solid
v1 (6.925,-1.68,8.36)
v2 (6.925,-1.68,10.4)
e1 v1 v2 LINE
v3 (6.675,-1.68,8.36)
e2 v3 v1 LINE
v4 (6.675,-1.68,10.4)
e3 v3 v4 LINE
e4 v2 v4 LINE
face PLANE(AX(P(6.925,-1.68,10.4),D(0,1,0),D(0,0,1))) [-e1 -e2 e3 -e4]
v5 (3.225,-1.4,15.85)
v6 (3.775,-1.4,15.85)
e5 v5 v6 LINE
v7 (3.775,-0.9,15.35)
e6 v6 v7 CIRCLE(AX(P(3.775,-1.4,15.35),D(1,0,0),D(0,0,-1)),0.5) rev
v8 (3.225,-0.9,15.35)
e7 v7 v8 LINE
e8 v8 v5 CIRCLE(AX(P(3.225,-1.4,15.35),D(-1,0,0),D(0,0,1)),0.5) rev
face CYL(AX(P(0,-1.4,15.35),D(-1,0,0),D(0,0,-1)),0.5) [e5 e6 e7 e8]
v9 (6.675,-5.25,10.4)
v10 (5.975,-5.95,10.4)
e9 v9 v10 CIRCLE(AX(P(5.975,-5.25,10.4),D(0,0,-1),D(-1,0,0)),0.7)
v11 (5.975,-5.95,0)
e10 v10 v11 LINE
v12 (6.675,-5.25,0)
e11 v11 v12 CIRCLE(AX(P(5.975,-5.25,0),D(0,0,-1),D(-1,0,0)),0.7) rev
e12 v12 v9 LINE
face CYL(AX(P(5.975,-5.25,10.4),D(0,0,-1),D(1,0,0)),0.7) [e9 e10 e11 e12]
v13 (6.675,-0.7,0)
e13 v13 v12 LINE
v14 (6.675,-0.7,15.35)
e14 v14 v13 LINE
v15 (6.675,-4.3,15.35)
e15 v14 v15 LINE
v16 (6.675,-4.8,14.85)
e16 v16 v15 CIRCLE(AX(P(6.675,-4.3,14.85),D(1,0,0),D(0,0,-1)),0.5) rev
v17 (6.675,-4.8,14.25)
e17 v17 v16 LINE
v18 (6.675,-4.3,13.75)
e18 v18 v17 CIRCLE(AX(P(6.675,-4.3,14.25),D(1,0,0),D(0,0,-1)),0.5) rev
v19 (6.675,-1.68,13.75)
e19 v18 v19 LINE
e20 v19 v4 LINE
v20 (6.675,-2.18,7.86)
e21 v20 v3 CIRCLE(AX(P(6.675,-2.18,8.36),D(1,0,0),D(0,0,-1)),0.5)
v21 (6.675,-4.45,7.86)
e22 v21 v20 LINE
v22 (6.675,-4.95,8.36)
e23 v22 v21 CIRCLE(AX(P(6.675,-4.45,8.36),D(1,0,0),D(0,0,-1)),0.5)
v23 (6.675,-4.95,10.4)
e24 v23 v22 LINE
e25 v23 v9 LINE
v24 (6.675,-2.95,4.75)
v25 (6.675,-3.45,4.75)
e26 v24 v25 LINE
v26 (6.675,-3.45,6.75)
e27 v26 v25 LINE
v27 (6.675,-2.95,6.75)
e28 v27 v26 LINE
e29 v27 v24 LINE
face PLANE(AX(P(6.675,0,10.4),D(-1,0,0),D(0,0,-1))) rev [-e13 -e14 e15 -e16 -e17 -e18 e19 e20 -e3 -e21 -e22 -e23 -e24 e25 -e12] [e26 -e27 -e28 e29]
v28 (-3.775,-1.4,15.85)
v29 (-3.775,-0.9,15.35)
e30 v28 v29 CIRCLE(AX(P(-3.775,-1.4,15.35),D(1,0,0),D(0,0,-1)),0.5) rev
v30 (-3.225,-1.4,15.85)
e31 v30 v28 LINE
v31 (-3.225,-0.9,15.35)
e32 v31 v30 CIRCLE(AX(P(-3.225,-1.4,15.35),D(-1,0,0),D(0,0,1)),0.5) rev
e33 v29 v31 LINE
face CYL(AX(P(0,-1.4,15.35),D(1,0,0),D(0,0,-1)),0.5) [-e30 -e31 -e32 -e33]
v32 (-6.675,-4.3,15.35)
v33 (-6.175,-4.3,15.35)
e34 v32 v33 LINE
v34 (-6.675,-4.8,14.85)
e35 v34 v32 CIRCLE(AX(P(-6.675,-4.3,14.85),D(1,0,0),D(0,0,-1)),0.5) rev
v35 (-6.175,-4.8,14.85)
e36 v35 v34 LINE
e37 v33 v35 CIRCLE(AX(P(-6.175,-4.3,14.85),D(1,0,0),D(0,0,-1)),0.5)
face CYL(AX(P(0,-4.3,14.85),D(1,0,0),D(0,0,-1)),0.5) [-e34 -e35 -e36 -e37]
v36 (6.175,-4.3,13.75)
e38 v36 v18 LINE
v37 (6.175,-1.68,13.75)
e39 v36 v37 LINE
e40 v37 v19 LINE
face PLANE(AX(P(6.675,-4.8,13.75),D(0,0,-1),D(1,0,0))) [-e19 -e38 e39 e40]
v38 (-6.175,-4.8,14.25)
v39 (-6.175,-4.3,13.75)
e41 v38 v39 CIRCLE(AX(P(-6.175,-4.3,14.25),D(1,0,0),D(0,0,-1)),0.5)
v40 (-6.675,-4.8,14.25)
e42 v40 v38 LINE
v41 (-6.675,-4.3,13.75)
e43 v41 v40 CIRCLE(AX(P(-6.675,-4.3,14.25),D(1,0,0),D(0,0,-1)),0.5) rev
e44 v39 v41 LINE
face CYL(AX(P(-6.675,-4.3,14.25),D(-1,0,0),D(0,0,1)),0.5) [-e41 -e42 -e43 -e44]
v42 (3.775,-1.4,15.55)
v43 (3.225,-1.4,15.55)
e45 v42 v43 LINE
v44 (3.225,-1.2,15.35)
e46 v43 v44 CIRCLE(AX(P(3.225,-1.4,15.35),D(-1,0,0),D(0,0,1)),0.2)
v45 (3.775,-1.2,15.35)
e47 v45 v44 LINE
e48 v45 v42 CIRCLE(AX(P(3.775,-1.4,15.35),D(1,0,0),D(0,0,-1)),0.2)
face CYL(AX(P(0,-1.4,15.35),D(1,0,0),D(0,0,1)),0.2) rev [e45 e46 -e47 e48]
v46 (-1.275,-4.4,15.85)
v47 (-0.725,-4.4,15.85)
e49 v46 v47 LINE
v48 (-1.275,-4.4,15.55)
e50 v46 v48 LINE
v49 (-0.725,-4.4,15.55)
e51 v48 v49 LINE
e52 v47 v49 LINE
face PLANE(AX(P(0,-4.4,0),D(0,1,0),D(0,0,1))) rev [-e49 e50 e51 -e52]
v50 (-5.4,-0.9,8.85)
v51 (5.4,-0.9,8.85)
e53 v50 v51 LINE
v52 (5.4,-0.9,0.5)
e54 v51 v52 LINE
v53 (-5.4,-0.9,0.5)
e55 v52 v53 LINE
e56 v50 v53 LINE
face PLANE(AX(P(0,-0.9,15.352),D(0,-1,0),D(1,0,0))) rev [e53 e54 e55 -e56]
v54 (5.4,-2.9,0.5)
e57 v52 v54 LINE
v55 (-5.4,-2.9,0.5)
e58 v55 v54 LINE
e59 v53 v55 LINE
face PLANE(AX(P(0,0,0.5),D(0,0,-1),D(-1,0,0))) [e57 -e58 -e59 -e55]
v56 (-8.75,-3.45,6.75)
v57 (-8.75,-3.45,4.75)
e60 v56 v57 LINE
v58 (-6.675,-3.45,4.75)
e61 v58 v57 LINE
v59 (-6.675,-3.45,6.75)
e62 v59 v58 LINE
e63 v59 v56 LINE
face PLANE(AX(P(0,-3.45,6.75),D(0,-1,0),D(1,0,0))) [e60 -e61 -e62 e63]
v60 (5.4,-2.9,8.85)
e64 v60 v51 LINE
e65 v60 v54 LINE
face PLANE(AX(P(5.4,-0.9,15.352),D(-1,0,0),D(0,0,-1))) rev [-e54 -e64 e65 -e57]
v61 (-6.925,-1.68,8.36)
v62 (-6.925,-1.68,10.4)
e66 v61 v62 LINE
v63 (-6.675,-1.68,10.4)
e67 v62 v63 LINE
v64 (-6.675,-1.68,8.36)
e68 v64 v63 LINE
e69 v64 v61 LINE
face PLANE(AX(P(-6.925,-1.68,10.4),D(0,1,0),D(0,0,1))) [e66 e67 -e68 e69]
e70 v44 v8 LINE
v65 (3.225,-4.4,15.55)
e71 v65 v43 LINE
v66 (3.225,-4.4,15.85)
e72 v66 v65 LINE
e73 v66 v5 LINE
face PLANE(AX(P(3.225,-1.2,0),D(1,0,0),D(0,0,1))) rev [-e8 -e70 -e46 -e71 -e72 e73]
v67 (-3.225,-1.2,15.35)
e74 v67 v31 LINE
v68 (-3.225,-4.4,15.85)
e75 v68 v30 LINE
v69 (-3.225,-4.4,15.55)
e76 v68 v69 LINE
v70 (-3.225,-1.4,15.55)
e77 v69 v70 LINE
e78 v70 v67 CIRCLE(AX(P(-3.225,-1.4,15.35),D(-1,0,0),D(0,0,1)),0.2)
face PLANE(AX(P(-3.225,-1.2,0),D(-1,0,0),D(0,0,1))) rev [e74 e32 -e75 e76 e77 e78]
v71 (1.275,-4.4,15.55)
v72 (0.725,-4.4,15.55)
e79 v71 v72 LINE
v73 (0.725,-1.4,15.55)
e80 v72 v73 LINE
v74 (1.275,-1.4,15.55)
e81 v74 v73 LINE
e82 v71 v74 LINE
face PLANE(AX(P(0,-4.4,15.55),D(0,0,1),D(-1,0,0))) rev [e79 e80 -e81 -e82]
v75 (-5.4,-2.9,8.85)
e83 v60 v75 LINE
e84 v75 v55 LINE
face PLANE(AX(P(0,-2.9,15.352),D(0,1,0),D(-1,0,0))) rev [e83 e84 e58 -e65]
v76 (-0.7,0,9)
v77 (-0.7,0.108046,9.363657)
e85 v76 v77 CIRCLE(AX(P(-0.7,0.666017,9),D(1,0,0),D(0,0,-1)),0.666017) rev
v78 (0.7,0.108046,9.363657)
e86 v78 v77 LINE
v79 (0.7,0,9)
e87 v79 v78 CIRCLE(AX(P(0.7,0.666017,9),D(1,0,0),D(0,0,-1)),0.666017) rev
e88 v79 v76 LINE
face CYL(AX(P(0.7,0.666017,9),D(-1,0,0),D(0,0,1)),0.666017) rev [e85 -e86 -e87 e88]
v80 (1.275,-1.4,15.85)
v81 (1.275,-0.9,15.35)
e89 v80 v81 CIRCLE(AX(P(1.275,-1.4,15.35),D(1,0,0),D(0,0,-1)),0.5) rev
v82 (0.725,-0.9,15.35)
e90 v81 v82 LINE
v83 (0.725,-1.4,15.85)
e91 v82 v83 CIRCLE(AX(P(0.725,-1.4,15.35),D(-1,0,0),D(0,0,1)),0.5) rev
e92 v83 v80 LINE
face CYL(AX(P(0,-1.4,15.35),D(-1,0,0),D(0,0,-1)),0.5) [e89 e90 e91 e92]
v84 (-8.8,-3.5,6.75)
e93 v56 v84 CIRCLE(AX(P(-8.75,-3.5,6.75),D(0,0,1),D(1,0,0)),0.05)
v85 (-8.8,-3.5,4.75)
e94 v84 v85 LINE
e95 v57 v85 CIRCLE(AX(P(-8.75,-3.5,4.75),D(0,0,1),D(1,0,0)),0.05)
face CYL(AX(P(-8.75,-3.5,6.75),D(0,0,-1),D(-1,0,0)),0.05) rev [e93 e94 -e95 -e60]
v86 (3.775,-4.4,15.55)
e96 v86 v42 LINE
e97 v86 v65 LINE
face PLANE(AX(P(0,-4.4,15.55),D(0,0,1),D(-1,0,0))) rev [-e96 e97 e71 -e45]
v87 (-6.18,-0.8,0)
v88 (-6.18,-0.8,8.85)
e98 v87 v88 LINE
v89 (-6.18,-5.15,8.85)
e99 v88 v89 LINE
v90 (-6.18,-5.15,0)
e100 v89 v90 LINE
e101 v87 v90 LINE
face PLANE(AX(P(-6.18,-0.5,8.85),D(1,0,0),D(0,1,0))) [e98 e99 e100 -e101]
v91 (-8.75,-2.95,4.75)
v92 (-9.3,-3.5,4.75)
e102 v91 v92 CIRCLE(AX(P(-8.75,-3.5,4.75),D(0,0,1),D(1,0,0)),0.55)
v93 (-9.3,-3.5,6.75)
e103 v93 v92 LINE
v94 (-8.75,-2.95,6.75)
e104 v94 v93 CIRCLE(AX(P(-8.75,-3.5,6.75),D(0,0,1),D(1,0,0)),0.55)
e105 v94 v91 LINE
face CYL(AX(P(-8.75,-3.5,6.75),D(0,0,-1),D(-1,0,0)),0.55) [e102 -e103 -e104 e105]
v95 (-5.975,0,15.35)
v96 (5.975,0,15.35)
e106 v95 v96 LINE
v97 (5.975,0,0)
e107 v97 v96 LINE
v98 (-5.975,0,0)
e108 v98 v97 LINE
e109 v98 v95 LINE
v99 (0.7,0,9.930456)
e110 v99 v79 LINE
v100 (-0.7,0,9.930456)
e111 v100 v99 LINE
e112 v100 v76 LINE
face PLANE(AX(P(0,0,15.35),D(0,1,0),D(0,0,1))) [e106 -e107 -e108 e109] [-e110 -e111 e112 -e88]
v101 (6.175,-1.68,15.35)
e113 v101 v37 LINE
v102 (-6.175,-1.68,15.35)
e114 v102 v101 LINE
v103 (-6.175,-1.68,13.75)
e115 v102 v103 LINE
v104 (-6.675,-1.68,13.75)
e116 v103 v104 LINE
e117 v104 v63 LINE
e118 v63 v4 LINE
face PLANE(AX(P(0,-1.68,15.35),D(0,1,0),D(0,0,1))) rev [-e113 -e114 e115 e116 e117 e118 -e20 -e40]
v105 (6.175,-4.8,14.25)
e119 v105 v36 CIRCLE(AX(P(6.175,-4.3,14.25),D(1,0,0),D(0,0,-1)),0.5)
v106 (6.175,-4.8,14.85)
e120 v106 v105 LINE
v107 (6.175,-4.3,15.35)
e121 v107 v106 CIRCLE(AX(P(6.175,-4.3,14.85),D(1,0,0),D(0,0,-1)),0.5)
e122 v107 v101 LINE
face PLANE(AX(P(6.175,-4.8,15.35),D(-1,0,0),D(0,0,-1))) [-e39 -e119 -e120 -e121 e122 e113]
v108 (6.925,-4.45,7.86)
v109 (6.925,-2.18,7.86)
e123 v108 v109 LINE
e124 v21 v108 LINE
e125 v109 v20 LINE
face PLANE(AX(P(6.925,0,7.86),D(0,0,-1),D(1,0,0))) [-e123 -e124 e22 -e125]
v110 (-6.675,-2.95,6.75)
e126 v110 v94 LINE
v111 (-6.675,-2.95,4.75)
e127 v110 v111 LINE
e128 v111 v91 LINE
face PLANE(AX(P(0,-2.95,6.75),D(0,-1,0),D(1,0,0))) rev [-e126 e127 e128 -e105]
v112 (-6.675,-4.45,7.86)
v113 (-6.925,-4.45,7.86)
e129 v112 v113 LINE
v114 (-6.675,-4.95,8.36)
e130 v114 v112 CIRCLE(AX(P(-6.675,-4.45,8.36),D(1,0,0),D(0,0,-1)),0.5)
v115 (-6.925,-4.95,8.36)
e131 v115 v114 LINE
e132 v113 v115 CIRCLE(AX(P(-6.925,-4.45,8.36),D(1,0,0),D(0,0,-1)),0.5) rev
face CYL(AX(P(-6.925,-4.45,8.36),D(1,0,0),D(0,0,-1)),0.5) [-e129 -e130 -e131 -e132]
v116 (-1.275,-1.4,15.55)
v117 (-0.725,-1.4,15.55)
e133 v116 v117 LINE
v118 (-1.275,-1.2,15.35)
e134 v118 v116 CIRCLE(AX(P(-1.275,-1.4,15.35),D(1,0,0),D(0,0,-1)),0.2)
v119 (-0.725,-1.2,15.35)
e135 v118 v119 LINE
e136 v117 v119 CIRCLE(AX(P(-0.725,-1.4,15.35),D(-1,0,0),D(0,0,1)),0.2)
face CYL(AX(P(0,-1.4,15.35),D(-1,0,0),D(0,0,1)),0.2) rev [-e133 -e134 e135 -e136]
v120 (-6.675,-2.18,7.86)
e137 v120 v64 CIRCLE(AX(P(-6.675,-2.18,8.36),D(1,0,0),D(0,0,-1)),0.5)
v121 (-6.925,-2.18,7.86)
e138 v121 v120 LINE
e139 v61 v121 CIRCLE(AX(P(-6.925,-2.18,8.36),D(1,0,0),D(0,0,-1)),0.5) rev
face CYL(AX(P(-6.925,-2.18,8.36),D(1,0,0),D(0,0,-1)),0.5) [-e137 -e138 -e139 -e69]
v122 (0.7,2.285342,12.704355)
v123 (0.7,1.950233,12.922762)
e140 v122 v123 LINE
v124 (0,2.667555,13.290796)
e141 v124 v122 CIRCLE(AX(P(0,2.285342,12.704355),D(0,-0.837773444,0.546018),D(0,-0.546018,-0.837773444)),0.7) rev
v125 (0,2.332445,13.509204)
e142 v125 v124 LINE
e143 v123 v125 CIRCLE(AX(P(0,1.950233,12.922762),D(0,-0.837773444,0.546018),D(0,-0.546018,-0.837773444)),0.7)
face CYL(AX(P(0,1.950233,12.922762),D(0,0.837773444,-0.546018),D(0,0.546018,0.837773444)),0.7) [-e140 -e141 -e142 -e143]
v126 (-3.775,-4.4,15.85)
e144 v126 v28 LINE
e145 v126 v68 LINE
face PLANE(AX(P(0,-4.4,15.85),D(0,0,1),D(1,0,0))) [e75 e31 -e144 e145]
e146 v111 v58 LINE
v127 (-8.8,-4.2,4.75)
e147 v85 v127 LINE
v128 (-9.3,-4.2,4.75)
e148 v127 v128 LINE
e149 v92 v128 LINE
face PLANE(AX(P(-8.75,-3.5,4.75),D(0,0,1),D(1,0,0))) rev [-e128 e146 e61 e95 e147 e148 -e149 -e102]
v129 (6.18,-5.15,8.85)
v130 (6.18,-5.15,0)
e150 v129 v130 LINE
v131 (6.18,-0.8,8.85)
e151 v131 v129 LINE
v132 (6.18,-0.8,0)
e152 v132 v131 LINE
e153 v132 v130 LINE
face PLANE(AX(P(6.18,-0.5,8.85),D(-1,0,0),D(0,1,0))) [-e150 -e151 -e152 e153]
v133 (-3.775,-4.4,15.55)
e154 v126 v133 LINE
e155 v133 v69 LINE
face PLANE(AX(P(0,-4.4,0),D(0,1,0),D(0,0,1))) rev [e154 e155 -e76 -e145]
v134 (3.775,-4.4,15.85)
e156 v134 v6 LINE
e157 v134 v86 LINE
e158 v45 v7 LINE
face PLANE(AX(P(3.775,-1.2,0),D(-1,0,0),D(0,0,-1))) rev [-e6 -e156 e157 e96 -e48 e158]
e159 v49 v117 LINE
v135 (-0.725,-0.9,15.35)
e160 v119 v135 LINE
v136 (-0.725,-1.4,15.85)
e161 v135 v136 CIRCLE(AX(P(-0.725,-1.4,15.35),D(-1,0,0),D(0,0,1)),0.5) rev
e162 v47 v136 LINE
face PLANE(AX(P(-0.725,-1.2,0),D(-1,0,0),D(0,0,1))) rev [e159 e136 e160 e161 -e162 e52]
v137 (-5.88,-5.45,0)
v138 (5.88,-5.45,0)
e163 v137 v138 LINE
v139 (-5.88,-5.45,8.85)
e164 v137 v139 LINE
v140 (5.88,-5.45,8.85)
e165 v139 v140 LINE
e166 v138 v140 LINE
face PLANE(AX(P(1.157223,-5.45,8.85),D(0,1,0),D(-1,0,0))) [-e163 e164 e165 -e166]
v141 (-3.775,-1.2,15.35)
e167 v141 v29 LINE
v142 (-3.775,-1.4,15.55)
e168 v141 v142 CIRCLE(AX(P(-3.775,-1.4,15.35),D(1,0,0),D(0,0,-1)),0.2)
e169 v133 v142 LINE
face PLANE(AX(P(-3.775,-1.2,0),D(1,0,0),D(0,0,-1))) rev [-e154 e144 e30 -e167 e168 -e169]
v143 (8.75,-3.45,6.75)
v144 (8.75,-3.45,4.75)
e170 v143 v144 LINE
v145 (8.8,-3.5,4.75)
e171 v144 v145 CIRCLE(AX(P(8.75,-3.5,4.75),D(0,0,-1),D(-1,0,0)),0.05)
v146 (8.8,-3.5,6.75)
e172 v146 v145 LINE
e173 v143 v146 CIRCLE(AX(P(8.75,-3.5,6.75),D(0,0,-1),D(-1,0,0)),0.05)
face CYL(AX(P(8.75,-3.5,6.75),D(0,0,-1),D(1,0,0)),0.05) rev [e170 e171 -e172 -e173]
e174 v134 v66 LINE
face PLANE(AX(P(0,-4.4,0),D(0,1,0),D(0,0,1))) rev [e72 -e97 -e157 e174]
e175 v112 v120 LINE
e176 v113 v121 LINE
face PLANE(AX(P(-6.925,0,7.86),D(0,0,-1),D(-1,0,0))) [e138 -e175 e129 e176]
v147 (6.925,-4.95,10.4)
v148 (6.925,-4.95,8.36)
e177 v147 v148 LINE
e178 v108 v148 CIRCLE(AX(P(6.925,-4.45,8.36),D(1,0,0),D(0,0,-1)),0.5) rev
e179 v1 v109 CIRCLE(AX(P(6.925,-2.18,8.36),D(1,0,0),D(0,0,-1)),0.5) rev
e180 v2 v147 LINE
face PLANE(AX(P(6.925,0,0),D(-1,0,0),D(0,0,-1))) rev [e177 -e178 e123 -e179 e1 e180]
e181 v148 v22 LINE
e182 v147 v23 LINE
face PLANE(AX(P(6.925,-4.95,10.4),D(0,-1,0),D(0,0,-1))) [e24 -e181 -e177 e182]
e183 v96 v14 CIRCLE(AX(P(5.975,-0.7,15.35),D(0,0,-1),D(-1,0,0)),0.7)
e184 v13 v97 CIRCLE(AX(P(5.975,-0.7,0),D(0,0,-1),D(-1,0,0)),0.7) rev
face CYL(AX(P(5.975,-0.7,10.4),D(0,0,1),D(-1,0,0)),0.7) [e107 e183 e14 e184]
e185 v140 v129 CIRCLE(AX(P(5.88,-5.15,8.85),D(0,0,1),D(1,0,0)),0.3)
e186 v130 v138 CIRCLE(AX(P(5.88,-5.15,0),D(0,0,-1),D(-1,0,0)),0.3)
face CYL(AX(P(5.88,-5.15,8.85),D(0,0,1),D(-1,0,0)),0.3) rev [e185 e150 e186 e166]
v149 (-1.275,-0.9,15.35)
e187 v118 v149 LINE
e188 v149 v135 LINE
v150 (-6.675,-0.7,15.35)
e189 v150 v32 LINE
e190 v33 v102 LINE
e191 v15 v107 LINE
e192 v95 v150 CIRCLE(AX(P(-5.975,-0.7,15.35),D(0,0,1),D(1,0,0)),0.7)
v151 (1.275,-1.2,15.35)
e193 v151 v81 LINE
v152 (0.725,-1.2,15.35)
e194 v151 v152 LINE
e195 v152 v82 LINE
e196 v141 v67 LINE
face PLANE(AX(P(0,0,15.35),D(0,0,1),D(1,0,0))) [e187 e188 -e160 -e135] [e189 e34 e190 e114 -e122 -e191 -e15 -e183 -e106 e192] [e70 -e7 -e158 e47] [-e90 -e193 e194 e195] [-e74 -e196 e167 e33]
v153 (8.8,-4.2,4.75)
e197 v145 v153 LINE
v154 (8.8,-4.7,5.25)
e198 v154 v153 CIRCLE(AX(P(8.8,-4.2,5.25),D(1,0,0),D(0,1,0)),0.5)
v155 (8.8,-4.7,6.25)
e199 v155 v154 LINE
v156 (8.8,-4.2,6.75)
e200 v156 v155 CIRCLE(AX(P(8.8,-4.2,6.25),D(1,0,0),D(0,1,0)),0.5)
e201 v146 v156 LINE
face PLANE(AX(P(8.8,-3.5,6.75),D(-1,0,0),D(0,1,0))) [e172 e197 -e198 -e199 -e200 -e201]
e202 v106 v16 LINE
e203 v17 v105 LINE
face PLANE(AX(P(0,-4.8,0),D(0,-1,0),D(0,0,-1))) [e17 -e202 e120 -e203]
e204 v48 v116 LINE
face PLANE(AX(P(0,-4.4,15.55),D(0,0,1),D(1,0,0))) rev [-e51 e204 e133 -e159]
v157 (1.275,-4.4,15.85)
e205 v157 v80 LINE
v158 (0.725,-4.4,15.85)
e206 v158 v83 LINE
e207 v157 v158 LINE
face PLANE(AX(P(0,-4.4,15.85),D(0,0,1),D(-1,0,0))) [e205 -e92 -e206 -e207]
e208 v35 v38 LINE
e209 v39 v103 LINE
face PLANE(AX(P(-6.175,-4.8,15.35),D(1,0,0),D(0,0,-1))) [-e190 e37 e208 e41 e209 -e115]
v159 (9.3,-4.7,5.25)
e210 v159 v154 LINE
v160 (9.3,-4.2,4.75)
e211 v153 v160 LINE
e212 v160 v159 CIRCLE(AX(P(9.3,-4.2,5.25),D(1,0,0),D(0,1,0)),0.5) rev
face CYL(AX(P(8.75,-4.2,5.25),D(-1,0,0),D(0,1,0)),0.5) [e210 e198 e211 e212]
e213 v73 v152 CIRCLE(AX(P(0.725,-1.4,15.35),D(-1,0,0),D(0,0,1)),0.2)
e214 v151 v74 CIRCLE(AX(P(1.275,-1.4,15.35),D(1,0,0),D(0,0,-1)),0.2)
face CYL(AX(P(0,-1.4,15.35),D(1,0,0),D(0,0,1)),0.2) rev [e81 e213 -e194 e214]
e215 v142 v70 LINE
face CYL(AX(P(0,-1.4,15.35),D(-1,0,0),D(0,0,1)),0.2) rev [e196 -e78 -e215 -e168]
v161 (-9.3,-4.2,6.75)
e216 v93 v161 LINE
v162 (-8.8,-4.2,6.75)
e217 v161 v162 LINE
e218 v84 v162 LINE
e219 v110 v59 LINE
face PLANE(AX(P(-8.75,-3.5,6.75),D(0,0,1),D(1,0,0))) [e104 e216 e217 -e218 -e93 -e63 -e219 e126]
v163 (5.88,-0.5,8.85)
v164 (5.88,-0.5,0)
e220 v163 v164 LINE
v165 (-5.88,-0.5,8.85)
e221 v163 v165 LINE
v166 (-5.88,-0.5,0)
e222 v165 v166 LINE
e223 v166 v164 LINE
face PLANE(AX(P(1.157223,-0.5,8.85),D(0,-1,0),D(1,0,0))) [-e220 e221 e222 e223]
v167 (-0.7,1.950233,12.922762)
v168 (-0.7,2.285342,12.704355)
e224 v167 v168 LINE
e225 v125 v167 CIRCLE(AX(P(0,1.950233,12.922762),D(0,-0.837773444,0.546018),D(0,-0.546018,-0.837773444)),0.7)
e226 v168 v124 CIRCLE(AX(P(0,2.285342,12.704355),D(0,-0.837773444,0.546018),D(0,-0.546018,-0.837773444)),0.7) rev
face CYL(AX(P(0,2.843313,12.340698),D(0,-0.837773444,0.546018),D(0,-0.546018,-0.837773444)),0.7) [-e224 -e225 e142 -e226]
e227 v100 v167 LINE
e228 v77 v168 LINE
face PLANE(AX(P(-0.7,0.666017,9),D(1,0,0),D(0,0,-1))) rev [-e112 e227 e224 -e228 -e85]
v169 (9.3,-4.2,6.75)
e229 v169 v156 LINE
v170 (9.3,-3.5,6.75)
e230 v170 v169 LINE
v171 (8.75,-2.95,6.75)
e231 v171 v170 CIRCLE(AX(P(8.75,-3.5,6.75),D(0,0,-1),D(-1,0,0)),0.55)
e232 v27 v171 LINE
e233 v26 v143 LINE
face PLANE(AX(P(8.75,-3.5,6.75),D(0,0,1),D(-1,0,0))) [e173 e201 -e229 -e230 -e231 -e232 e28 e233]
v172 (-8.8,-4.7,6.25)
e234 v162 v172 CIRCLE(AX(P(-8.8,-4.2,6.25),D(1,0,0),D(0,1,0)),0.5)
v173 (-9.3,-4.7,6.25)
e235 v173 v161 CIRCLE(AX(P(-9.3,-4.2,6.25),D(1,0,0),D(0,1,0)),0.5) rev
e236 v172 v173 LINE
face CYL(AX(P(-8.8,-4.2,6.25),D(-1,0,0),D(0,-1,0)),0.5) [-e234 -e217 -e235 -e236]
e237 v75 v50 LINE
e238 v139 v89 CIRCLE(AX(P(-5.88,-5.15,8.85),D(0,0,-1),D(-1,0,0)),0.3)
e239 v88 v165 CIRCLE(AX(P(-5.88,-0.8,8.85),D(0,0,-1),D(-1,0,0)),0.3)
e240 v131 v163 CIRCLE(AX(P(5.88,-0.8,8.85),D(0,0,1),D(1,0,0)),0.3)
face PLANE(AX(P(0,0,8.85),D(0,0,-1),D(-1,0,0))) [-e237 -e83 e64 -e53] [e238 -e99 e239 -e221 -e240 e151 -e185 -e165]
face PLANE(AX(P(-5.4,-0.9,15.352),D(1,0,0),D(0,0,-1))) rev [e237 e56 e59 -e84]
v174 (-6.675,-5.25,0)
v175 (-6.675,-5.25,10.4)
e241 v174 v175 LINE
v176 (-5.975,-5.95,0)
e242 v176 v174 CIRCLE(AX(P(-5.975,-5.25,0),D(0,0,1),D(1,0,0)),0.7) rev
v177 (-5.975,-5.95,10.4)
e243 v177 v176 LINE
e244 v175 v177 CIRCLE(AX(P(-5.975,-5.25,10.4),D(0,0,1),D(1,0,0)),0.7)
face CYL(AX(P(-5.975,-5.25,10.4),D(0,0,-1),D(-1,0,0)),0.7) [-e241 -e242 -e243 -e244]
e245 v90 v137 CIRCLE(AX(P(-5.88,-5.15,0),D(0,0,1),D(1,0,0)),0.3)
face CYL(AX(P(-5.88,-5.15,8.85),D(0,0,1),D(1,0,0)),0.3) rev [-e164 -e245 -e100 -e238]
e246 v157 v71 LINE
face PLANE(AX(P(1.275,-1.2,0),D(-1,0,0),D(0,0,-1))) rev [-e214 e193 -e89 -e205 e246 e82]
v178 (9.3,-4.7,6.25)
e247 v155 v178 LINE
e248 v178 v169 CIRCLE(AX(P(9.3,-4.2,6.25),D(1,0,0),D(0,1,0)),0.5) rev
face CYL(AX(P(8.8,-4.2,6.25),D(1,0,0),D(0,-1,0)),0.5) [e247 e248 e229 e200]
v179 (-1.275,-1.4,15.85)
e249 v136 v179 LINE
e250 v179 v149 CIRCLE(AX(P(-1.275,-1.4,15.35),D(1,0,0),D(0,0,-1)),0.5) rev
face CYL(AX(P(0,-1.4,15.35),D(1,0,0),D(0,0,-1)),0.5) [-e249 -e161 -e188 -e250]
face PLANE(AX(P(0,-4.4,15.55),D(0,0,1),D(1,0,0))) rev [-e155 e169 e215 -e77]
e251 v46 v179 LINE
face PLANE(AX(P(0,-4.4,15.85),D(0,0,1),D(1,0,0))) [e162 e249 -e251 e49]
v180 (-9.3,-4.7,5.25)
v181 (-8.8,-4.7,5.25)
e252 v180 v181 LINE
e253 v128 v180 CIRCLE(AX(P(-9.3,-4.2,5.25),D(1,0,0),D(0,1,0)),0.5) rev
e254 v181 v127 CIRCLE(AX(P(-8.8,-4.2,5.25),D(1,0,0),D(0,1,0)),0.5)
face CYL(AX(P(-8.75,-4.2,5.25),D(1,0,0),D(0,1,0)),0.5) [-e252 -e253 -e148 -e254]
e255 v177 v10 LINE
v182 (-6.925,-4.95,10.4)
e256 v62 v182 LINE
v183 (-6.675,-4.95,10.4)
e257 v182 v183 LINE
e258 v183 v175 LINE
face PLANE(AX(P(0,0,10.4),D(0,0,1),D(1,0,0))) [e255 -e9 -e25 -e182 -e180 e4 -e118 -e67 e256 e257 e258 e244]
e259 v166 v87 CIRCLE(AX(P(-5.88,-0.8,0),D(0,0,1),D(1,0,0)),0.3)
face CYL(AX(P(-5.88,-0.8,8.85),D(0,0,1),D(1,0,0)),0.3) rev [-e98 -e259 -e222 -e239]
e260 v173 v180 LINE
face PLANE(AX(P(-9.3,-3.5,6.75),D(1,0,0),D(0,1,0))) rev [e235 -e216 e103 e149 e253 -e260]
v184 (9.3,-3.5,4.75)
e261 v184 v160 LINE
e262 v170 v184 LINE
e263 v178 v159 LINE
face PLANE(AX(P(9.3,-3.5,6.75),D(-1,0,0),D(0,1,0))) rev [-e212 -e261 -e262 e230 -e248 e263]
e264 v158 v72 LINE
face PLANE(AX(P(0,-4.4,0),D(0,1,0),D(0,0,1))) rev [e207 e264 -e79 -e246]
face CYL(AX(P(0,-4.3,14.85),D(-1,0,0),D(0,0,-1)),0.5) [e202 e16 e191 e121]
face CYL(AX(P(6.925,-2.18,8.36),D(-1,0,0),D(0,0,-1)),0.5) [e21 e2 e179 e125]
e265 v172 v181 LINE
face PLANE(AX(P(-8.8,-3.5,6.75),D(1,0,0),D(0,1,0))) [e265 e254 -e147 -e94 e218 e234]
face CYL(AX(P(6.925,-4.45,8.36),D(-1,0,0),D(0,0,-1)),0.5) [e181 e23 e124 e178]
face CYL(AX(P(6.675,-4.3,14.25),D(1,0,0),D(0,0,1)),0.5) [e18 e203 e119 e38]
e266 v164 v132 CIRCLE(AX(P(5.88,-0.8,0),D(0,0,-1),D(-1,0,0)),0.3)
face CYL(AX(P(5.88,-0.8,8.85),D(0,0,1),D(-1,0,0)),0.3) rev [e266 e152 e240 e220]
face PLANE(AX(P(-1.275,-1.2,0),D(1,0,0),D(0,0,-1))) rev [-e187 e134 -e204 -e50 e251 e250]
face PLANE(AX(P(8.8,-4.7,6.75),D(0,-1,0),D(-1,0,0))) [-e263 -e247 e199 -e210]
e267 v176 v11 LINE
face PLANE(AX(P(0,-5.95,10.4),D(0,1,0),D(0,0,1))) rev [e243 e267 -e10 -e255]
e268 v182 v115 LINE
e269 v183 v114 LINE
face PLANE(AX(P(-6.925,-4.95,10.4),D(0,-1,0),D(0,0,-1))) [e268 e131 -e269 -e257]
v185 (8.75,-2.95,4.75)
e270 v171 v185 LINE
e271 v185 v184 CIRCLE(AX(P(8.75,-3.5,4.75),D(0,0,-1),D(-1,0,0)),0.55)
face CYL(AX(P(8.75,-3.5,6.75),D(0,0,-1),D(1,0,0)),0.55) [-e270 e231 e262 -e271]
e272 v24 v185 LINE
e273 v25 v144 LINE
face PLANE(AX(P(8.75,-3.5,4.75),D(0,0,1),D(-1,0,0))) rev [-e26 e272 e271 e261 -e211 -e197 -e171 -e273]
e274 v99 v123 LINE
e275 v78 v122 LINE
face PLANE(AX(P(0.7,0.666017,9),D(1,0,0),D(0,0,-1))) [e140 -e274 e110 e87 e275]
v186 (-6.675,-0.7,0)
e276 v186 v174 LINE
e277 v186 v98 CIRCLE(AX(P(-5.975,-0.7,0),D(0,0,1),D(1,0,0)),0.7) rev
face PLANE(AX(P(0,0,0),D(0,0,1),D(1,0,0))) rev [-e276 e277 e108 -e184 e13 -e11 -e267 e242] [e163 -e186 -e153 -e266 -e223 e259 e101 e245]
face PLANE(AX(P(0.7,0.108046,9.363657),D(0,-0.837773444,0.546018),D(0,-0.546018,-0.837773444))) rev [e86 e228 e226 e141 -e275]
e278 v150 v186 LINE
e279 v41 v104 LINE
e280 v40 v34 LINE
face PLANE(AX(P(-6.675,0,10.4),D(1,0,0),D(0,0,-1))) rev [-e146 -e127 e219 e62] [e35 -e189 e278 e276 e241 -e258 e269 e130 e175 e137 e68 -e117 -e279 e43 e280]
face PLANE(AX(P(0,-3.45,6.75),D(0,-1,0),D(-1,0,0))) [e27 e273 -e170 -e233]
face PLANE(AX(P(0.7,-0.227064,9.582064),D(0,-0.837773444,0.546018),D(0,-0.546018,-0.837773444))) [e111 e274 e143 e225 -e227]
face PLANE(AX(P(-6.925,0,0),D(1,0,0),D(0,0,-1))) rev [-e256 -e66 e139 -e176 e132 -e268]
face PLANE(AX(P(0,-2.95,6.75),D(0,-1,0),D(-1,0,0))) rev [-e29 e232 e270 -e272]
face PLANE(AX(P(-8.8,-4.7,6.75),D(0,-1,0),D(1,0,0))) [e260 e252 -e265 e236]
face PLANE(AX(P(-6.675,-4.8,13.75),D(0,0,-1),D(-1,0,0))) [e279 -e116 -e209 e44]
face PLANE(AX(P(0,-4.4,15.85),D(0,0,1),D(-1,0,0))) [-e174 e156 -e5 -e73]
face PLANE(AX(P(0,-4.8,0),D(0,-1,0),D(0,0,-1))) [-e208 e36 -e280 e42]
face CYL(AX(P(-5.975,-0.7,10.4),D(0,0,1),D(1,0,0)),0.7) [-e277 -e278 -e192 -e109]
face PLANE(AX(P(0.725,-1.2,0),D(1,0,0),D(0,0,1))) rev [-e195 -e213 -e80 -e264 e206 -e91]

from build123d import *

# Parameters (mm, degrees)
SKIZZE1_W                         = 6.675
SKIZZE1_H                         = 4.27
AUFSATZ_LINEAR_AUSTRAGEN1_DEPTH   = 10.4
SKIZZE1_3_W                       = 6.675
SKIZZE1_3_H                       = 1.68
AUFSATZ_LINEAR_AUSTRAGEN2_DEPTH   = 15.35
LINEAR_AUSTRAGEN_D_NN1_START      = 4.75
LINEAR_AUSTRAGEN_D_NN1_DEPTH      = 2
SKIZZE3_W                         = 0.5
SKIZZE3_H                         = 1.6
AUFSATZ_LINEAR_AUSTRAGEN3_DEPTH   = 4.8
SKIZZE4_W                         = 7.337223246
SKIZZE4_H                         = 4.95
SCHNITT_LINEAR_AUSTRAGEN1_DEPTH   = 8.85
AUFSATZ_LINEAR_AUSTRAGEN4_REACH   = 21.408
AUFSATZ_LINEAR_START              = 0.5
SKIZZE5_W                         = 5.4
SKIZZE5_H                         = 2
AUFSATZ_LINEAR_START_2            = -0.9
SKIZZE6_W                         = 0.55
SKIZZE6_H                         = 0.3
AUFSATZ_LINEAR_AUSTRAGEN5_DEPTH   = 3.5
AUFSATZ_LINEAR_AUSTRAGEN5_2_DEPTH = 3.5
SKIZZE6_3_W                       = 0.55
SKIZZE6_3_H                       = 0.2
AUFSATZ_LINEAR_AUSTRAGEN6_DEPTH   = 0.3
VERRUNDUNG1_R                     = 0.2
VERRUNDUNG2_R                     = 0.5
VERRUNDUNG3_R                     = 0.3
VERRUNDUNG4_R                     = 0.7
AUFSATZ_LINEAR_START_3            = -6.675
SKIZZE7_W                         = 2.54
SKIZZE7_H                         = 3.27
AUFSATZ_LINEAR_AUSTRAGEN7_DEPTH   = 0.25
VERRUNDUNG6_R                     = 0.5
VERRUNDUNG7_R                     = 0.5
LINEAR_AUSTRAGEN_D_NN2_DEPTH      = 0.7
VERRUNDUNG5_R                     = 0.7


with BuildPart() as part:
    # Skizze1 → Aufsatz-Linear austragen1 (new body)
    with BuildSketch(Plane.XY):
        with Locations((-3.3375, -3.815)):
            Rectangle(SKIZZE1_W, SKIZZE1_H)
    extrude(amount=AUFSATZ_LINEAR_AUSTRAGEN1_DEPTH)

    # Skizze1<3> → Aufsatz-Linear austragen2 (add)
    with BuildSketch(Plane.XY):
        with Locations((-3.3375, -0.84)):
            Rectangle(SKIZZE1_3_W, SKIZZE1_3_H)
    extrude(amount=AUFSATZ_LINEAR_AUSTRAGEN2_DEPTH)

    # Skizze2 → Linear-Austragen-Dünn1 (add)
    with BuildSketch(Plane.XY.offset(LINEAR_AUSTRAGEN_D_NN1_START)):
        with BuildLine():
            Line((0, -2.95), (-8.75, -2.95))
            ThreePointArc((-8.75, -2.95), (-9.13890873, -3.11109127), (-9.3, -3.5))
            Line((-9.3, -3.5), (-9.3, -4.7))
            Line((-9.3, -4.7), (-8.8, -4.7))
            Line((-8.8, -4.7), (-8.8, -3.5))
            ThreePointArc((-8.8, -3.5), (-8.785355339, -3.464644661), (-8.75, -3.45))
            Line((-8.75, -3.45), (0, -3.45))
            Line((0, -3.45), (0, -2.95))
        make_face()
    extrude(amount=LINEAR_AUSTRAGEN_D_NN1_DEPTH)

    # Skizze3 → Aufsatz-Linear austragen3 (add)
    with BuildSketch(Plane(origin=(0, 0, 0), x_dir=(1, 0, 0), z_dir=(0, 1, 0))):
        with Locations((-6.425, -14.55)):
            Rectangle(SKIZZE3_W, SKIZZE3_H)
    extrude(amount=-AUFSATZ_LINEAR_AUSTRAGEN3_DEPTH)

    # Skizze4 → Schnitt-Linear austragen1 (cut)
    with BuildSketch(Plane.XY):
        with Locations((-2.511388377, -2.975)):
            Rectangle(SKIZZE4_W, SKIZZE4_H)
    extrude(amount=SCHNITT_LINEAR_AUSTRAGEN1_DEPTH, mode=Mode.SUBTRACT)

    # Skizze5 → Aufsatz-Linear austragen4 (add, up to next)
    with BuildSketch(Plane.XY.offset(AUFSATZ_LINEAR_START), mode=Mode.PRIVATE) as aufsatz_linear_austragen4_sk1:
        with Locations((-2.7, -1.9)):
            Rectangle(SKIZZE5_W, SKIZZE5_H)
    aufsatz_linear_austragen4_tool1 = extrude(aufsatz_linear_austragen4_sk1.sketch, amount=AUFSATZ_LINEAR_AUSTRAGEN4_REACH, mode=Mode.PRIVATE) - part.part
    add(aufsatz_linear_austragen4_tool1.solids().sort_by_distance((-2.7, -1.9, 0.5))[0])



with BuildPart() as body_2:
    # Skizze6 → Aufsatz-Linear austragen5 (new body)
    with BuildSketch(Plane(origin=(0, 0, 0), x_dir=(1, 0, 0), z_dir=(0, 1, 0)).offset(AUFSATZ_LINEAR_START_2)):
        with Locations((-1, -15.7)):
            Rectangle(SKIZZE6_W, SKIZZE6_H)
    extrude(amount=-AUFSATZ_LINEAR_AUSTRAGEN5_DEPTH)


with BuildPart() as body_3:
    # Skizze6 → Aufsatz-Linear austragen5 2 (new body)
    with BuildSketch(Plane(origin=(0, 0, 0), x_dir=(1, 0, 0), z_dir=(0, 1, 0)).offset(AUFSATZ_LINEAR_START_2)):
        with Locations((-3.5, -15.7)):
            Rectangle(SKIZZE6_W, SKIZZE6_H)
    extrude(amount=-AUFSATZ_LINEAR_AUSTRAGEN5_2_DEPTH)


with BuildPart() as part_1:
    add(part.part)

    add(body_2.part)  # Aufsatz-Linear austragen6 merges body 2

    add(body_3.part)  # Aufsatz-Linear austragen6 merges body 3
    # Skizze6<3> → Aufsatz-Linear austragen6 (add)
    with BuildSketch(Plane(origin=(0, 0, 0), x_dir=(1, 0, 0), z_dir=(0, 1, 0)).offset(AUFSATZ_LINEAR_START_2)):
        with Locations((-3.5, -15.45)):
            Rectangle(SKIZZE6_3_W, SKIZZE6_3_H)
        with Locations((-1, -15.45)):
            Rectangle(SKIZZE6_3_W, SKIZZE6_3_H)
    extrude(amount=-AUFSATZ_LINEAR_AUSTRAGEN6_DEPTH)

    # Verrundung1
    verrundung1_edges = [part_1.edges().sort_by_distance(p)[0] for p in [
        (-3.5, -1.2, 15.55),
        (-1, -1.2, 15.55),
    ]]
    fillet(verrundung1_edges, radius=VERRUNDUNG1_R - 0.0001)  # a hair under: the kernel refuses the full size

    # Verrundung2
    verrundung2_edges = [part_1.edges().sort_by_distance(p)[0] for p in [
        (-1, -0.9, 15.85),
        (-3.5, -0.9, 15.85),
    ]]
    fillet(verrundung2_edges, radius=VERRUNDUNG2_R - 0.0001)  # a hair under: the kernel refuses the full size

    # Verrundung3
    verrundung3_edges = [part_1.edges().sort_by_distance(p)[0] for p in [
        (-6.18, -0.5, 4.425),
        (-6.18, -5.45, 4.425),
    ]]
    fillet(verrundung3_edges, radius=VERRUNDUNG3_R)

    # Verrundung4
    verrundung4_edges = [part_1.edges().sort_by_distance(p)[0] for p in [
        (-6.675, 0, 7.675),
        (-6.675, -5.95, 5.2),
    ]]
    fillet(verrundung4_edges, radius=VERRUNDUNG4_R)

    # Skizze7 → Aufsatz-Linear austragen7 (add)
    with BuildSketch(Plane(origin=(0, 0, 0), x_dir=(0, 0, -1), z_dir=(1, 0, 0)).offset(AUFSATZ_LINEAR_START_3)):
        with Locations((-9.13, -3.315)):
            Rectangle(SKIZZE7_W, SKIZZE7_H)
    extrude(amount=-AUFSATZ_LINEAR_AUSTRAGEN7_DEPTH)

    # Verrundung6
    verrundung6_edges = [part_1.edges().sort_by_distance(p)[0] for p in [
        (-9.05, -4.7, 4.75),
        (-9.05, -4.7, 6.75),
        (-6.425, -4.8, 13.75),
        (-6.425, -4.8, 15.35),
    ]]
    fillet(verrundung6_edges, radius=VERRUNDUNG6_R)

    # Verrundung7
    verrundung7_edges = [part_1.edges().sort_by_distance(p)[0] for p in [
        (-6.8, -1.68, 7.86),
        (-6.8, -4.95, 7.86),
    ]]
    fillet(verrundung7_edges, radius=VERRUNDUNG7_R)

    # Spiegeln1: part across plane


with BuildPart() as part_2:
    add(part_1.part)
    add(part_1.part.mirror(Plane(origin=(0, 0, 0), x_dir=(0, 0, 1), z_dir=(1, 0, 0))))

    # Skizze8 → Linear-Austragen-Dünn2 (add, symmetric)
    with BuildSketch(Plane(origin=(0, 0, 0), x_dir=(0, 0, -1), z_dir=(1, 0, 0))):
        with BuildLine():
            Line((-7.127333731, 0), (-9, 0))
            ThreePointArc((-9, 0), (-9.189684168, 0.027582553), (-9.363657097, 0.108045593))
            Line((-9.363657097, 0.108045593), (-13.2907964, 2.667554689))
            Line((-13.2907964, 2.667554689), (-13.5092036, 2.332445311))
            Line((-13.5092036, 2.332445311), (-9.582064297, -0.227063785))
            ThreePointArc((-9.582064297, -0.227063785), (-9.303605739, -0.355851764), (-9, -0.4))
            Line((-9, -0.4), (-7.127333731, -0.4))
            Line((-7.127333731, -0.4), (-7.127333731, 0))
        make_face()
    extrude(amount=LINEAR_AUSTRAGEN_D_NN2_DEPTH, both=True)

    # Verrundung5
    verrundung5_edges = [part_2.edges().sort_by_distance(p)[0] for p in [
        (-0.7, 2.5, 13.4),
        (0.7, 2.5, 13.4),
    ]]
    fillet(verrundung5_edges, radius=VERRUNDUNG5_R - 0.0001)  # a hair under: the kernel refuses the full size


solid = part_2.part
